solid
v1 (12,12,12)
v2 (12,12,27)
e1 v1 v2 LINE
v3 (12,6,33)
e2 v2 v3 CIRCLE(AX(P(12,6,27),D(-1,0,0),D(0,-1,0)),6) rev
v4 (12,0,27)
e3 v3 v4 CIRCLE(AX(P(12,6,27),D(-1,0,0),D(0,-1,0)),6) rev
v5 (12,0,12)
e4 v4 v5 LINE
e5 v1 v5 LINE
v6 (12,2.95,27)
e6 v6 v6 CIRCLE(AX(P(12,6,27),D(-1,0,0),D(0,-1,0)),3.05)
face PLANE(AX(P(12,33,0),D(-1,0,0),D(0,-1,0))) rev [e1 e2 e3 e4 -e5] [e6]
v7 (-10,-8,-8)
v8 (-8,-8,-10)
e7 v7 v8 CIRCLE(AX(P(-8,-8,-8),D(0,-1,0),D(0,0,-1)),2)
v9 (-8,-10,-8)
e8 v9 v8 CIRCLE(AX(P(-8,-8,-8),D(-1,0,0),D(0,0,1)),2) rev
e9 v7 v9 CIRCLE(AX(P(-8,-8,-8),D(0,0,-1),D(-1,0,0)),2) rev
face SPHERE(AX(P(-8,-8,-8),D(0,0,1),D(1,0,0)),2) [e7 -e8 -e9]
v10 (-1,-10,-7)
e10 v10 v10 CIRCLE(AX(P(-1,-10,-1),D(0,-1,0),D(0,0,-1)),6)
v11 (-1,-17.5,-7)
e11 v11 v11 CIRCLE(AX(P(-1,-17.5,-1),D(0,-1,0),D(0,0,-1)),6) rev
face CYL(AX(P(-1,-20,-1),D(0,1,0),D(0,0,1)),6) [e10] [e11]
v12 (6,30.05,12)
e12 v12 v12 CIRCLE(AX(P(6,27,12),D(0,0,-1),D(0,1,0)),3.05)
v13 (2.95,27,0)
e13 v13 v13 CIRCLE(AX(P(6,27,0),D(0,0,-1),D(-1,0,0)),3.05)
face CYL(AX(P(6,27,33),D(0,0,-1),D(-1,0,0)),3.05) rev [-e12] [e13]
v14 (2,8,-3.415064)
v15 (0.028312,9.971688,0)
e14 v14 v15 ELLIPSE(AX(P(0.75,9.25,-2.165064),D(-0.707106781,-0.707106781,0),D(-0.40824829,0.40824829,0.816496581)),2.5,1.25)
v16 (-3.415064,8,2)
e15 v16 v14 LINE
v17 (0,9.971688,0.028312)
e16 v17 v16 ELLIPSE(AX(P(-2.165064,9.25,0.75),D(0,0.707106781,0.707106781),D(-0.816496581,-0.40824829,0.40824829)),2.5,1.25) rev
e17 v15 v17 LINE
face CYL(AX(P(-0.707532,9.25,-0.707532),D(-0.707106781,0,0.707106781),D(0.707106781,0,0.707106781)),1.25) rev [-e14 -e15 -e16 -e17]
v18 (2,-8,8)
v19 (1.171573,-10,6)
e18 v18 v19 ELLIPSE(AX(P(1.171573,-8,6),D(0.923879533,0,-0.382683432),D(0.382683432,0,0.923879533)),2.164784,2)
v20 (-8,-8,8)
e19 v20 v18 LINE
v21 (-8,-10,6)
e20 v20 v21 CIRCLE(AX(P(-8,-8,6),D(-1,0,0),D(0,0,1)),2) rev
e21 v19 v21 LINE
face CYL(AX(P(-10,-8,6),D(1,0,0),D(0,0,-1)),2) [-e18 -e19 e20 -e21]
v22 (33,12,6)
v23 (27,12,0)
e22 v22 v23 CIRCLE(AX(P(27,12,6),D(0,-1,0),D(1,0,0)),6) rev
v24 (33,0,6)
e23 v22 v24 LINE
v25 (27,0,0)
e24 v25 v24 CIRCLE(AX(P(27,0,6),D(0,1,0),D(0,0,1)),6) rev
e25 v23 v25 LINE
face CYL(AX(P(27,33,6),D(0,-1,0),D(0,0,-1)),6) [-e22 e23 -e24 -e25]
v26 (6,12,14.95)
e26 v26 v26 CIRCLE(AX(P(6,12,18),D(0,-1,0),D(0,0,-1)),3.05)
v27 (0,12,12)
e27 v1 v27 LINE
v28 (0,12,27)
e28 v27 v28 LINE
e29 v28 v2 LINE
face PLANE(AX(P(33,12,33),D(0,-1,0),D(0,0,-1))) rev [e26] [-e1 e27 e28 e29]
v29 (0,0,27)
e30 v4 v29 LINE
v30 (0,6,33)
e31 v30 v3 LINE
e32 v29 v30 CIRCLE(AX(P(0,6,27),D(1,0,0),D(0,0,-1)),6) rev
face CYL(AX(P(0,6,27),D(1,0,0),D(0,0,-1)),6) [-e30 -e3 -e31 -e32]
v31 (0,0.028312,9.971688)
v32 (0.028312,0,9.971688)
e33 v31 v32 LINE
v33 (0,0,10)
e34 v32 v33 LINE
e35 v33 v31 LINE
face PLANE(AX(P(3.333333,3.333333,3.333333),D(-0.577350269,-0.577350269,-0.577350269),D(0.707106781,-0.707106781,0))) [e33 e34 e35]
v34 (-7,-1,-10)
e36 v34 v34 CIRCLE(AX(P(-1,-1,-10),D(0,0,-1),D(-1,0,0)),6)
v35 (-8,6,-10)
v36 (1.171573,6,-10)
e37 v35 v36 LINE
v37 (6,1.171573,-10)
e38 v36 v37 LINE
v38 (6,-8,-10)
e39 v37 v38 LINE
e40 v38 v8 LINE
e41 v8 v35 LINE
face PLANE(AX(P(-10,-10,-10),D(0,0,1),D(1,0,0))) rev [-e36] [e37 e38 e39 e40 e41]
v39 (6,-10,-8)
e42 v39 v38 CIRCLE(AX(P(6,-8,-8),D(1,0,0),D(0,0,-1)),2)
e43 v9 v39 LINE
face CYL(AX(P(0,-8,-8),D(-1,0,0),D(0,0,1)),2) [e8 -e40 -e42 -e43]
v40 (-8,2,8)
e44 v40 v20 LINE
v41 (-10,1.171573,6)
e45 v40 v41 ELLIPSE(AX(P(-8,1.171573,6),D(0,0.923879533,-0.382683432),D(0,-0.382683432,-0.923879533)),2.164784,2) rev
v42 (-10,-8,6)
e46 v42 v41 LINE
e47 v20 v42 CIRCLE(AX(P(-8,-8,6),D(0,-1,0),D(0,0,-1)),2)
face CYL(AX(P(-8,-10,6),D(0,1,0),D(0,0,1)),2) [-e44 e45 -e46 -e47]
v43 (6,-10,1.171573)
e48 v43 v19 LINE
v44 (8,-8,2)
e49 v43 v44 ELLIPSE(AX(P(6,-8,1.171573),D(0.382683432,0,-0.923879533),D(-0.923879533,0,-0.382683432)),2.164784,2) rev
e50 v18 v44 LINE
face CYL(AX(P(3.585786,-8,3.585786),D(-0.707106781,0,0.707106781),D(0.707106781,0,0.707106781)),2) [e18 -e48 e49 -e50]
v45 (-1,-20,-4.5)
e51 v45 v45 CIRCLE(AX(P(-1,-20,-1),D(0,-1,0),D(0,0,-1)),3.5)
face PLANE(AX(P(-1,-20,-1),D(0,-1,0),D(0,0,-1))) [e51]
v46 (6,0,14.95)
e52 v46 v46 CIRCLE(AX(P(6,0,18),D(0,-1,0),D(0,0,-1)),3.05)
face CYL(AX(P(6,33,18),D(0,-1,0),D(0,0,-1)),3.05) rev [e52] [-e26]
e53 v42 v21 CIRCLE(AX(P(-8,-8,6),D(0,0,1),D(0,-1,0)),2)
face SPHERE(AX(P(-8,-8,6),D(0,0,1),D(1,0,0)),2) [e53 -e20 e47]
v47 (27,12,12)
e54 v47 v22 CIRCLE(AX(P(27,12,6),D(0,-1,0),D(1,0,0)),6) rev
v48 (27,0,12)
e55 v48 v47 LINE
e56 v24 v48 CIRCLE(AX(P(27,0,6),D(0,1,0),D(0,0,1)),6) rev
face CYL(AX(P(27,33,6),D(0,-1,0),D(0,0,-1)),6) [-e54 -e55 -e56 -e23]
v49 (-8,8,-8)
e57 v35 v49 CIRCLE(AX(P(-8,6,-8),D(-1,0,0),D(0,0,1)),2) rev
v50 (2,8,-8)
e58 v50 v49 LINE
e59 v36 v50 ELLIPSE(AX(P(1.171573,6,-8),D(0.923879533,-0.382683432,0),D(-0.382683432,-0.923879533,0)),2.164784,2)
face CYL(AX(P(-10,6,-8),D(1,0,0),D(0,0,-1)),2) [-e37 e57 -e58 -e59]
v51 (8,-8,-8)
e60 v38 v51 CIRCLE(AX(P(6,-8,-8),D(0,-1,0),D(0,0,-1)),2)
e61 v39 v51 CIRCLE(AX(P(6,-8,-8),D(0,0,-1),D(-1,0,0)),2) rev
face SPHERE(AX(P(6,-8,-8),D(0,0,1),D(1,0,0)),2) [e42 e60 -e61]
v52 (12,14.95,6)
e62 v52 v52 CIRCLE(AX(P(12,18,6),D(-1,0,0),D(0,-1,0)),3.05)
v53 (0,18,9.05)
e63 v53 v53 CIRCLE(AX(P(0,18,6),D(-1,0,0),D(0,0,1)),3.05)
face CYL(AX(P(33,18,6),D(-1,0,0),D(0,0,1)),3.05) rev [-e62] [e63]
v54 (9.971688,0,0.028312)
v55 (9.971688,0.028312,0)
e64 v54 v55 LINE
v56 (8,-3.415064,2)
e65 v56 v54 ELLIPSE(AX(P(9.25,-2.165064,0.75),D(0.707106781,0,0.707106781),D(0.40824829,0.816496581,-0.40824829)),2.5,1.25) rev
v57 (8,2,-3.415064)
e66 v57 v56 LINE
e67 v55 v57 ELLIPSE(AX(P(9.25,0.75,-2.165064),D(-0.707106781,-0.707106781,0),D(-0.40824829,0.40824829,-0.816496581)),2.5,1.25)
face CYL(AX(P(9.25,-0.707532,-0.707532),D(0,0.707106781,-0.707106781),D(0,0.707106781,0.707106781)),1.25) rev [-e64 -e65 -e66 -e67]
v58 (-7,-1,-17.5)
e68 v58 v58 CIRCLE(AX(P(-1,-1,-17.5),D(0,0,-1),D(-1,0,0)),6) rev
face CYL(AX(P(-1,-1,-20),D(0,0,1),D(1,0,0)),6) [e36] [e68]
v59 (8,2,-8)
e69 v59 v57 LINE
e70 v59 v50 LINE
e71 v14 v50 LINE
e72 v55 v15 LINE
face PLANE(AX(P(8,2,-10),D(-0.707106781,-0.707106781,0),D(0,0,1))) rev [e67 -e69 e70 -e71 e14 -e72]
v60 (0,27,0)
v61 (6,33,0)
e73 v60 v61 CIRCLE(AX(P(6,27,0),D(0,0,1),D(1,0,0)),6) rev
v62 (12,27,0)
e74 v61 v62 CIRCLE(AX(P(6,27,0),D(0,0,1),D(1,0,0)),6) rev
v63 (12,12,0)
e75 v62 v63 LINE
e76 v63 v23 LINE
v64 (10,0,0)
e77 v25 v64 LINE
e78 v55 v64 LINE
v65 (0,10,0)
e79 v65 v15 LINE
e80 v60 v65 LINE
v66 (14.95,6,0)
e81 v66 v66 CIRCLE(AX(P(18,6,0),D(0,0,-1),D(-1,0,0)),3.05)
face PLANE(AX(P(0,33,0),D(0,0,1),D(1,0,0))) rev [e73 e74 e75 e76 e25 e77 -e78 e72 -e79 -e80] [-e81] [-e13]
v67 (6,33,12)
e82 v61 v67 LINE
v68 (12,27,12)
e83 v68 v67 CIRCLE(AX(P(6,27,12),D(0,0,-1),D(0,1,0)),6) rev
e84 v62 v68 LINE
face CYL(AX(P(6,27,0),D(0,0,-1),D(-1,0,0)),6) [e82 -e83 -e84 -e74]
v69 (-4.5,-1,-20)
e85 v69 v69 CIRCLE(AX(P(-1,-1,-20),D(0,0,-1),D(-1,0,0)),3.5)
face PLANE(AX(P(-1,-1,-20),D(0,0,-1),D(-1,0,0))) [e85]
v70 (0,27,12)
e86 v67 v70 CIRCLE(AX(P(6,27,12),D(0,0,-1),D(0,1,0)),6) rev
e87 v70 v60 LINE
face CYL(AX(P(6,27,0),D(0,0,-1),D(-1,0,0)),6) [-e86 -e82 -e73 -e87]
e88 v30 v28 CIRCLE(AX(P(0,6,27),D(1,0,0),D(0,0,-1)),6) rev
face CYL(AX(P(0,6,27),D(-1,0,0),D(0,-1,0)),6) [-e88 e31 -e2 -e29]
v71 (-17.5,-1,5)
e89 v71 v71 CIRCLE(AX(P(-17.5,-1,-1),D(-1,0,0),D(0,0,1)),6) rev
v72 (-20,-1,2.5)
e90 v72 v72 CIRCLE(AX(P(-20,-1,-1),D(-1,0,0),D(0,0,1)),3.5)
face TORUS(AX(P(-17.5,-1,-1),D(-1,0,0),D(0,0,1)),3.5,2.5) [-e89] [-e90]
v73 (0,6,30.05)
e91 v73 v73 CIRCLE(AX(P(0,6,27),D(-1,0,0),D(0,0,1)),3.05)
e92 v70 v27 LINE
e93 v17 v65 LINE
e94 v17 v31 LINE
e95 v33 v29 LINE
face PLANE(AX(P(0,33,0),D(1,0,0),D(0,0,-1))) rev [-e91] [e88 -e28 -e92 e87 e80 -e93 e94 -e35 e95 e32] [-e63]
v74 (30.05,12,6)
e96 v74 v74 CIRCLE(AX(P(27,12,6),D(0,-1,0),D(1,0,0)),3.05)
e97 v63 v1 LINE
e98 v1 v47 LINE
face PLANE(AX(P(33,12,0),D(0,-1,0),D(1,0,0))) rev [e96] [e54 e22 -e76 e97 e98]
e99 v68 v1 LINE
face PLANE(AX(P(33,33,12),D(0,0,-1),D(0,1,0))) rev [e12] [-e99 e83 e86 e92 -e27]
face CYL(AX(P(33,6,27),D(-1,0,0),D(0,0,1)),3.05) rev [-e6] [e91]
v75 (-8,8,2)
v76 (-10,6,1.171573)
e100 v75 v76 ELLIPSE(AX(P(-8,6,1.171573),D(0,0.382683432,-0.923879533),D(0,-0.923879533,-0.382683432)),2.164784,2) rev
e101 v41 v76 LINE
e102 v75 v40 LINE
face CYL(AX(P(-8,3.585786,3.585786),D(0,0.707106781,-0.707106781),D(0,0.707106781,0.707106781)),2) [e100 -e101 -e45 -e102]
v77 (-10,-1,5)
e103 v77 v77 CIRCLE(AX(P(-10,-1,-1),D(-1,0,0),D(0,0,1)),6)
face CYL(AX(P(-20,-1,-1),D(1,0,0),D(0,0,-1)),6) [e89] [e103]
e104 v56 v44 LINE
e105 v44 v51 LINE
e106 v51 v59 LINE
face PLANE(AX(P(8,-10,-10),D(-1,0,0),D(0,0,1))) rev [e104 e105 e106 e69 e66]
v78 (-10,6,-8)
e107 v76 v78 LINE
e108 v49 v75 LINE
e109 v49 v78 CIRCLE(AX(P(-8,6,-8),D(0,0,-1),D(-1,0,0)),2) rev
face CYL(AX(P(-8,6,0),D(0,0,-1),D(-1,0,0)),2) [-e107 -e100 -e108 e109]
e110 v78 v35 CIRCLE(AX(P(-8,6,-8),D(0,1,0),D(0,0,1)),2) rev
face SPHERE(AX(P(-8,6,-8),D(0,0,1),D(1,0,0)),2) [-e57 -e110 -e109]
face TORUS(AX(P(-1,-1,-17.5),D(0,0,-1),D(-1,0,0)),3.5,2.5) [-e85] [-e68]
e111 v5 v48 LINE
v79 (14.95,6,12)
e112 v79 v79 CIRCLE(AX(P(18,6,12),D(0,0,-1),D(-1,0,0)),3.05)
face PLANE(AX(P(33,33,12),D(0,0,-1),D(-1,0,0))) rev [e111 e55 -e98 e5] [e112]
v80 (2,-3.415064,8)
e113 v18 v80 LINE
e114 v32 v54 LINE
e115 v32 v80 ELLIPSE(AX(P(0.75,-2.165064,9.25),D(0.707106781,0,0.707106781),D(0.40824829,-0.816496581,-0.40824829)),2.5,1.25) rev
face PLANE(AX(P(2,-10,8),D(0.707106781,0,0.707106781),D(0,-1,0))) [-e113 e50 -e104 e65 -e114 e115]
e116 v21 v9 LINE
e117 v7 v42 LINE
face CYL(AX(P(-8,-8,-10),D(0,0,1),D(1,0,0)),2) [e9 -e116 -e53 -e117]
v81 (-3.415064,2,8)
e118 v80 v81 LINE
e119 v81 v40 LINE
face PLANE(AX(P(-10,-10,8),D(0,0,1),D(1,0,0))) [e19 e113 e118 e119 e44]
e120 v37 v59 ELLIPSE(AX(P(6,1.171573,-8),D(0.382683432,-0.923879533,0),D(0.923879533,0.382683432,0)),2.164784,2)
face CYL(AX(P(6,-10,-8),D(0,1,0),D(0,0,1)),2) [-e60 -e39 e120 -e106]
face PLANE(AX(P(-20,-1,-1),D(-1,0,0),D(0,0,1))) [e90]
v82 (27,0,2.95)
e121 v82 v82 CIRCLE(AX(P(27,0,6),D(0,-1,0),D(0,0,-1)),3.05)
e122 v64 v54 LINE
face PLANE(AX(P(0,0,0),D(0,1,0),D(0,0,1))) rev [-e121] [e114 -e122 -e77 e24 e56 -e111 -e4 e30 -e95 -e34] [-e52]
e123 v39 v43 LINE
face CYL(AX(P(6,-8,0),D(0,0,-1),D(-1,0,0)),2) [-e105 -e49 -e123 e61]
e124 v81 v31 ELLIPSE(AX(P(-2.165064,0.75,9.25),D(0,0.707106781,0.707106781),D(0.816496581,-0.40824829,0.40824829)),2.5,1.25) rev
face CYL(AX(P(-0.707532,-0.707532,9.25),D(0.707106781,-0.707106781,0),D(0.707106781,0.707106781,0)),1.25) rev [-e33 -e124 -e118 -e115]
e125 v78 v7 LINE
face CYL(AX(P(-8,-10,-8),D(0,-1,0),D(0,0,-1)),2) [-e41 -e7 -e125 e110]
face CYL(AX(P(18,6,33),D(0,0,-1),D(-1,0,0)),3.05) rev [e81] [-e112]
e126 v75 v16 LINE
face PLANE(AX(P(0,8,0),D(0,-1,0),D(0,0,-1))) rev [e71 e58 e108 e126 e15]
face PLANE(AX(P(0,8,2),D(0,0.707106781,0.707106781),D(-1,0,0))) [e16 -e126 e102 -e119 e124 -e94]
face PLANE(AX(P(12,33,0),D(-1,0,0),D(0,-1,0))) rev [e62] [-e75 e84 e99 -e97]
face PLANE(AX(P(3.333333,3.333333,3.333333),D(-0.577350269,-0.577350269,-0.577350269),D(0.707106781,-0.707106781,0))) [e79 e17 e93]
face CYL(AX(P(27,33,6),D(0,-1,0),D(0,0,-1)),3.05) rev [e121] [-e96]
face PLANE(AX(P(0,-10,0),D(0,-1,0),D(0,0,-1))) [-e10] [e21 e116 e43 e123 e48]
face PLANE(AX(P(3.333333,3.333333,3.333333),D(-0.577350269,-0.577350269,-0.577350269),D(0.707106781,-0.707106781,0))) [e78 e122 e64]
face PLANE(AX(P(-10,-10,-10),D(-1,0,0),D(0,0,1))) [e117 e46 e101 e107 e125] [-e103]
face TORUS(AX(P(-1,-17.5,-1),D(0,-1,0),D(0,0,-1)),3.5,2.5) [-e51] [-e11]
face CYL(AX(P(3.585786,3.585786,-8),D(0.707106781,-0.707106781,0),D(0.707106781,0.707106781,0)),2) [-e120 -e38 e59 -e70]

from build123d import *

# Parameters (mm, degrees)
SKETCH1_W                = 33
SKETCH1_H                = 33
BOSS_EXTRUDE1_DEPTH      = 33
SKETCH2_W                = 21
SKETCH2_H                = 21
CUT_EXTRUDE1_DEPTH       = 58.15767665
SKETCH3_W                = 21
SKETCH3_H                = 21
CUT_EXTRUDE2_DEPTH       = 58.15767665
SKETCH4_W                = 21
SKETCH4_H                = 21
CUT_EXTRUDE3_DEPTH       = 58.15767665
SKETCH5_R                = 3.05
CUT_EXTRUDE4_DEPTH       = 58.15767665
SKETCH6_R                = 3.05
CUT_EXTRUDE5_DEPTH       = 58.15767665
SKETCH7_R                = 3.05
CUT_EXTRUDE6_DEPTH       = 58.15767665
FILLET1_R                = 6
CHAMFER1_START           = -1
CHAMFER1_OUTLINE_W       = 16
CHAMFER1_OUTLINE_H       = 18
CHAMFER1_DEPTH           = 6.773502692
BOSS_EXTRUDE3_DEPTH      = 8
BOSS_EXTRUDE3_DEPTH_BACK = 10
SKETCH9_W                = 18
SKETCH9_H                = 18
CHAMFER2_SIZE            = 6
FILLET2_R                = 1.25
SKETCH10_R               = 6
BOSS_EXTRUDE4_DEPTH      = 10
SKETCH11_R               = 6
BOSS_EXTRUDE5_DEPTH      = 10
SKETCH12_R               = 6
BOSS_EXTRUDE6_DEPTH      = 10
FILLET3_R                = 2
FILLET4_R                = 2.5


with BuildPart() as part:
    # Sketch1 → Boss-Extrude1 (new body)
    with BuildSketch(Plane(origin=(0, 0, 0), x_dir=(1, 0, 0), z_dir=(0, 1, 0))):
        with Locations((16.5, -16.5)):
            Rectangle(SKETCH1_W, SKETCH1_H)
    extrude(amount=BOSS_EXTRUDE1_DEPTH)

    # Sketch2 → Cut-Extrude1 (cut, through all)
    with BuildSketch(Plane.XY.offset(33)):
        with Locations((22.5, 22.5)):
            Rectangle(SKETCH2_W, SKETCH2_H)
    extrude(amount=-CUT_EXTRUDE1_DEPTH, mode=Mode.SUBTRACT)

    # Sketch3 → Cut-Extrude2 (cut, through all)
    with BuildSketch(Plane.XZ):
        with Locations((22.5, 22.5)):
            Rectangle(SKETCH3_W, SKETCH3_H)
    extrude(amount=-CUT_EXTRUDE2_DEPTH, mode=Mode.SUBTRACT)

    # Sketch4 → Cut-Extrude3 (cut, through all)
    with BuildSketch(Plane.ZY):
        with Locations((22.5, 22.5)):
            Rectangle(SKETCH4_W, SKETCH4_H)
    extrude(amount=-CUT_EXTRUDE3_DEPTH, mode=Mode.SUBTRACT)

    # Sketch5 → Cut-Extrude4 (cut, through all)
    with BuildSketch(Plane.ZY):
        with Locations((27, 6)):
            Circle(SKETCH5_R)
        with Locations((6, 18)):
            Circle(SKETCH5_R)
    extrude(amount=-CUT_EXTRUDE4_DEPTH, mode=Mode.SUBTRACT)

    # Sketch6 → Cut-Extrude5 (cut, through all)
    with BuildSketch(Plane.XZ):
        with Locations(Location((6, 18, 0), (0, 0, 270))):
            Circle(SKETCH6_R)
        with Locations(Location((27, 6, 0), (0, 0, 270))):
            Circle(SKETCH6_R)
    extrude(amount=-CUT_EXTRUDE5_DEPTH, mode=Mode.SUBTRACT)

    # Sketch7 → Cut-Extrude6 (cut, through all)
    with BuildSketch(Plane(origin=(0, 0, 0), x_dir=(-1, 0, 0), z_dir=(0, 0, -1))):
        with Locations((-18, 6)):
            Circle(SKETCH7_R)
        with Locations((-6, 27)):
            Circle(SKETCH7_R)
    extrude(amount=-CUT_EXTRUDE6_DEPTH, mode=Mode.SUBTRACT)

    # Fillet1
    fillet1_edges = [part.edges().sort_by_distance(p)[0] for p in [
        (12, 33, 6),
        (0, 33, 6),
        (6, 12, 33),
        (6, 0, 33),
        (33, 6, 0),
        (33, 6, 12),
    ]]
    fillet(fillet1_edges, radius=FILLET1_R - 0.0001)  # a hair under: the kernel refuses the full size

    # Chamfer1: read off the stored shape, not the designer's step
    # Chamfer1 outline → Chamfer1 (cut)
    with BuildSketch(Plane(origin=(0, 0, 0), x_dir=(0.8164965809277258, -0.40824829046386313, -0.40824829046386313), z_dir=(0.5773502691896258, 0.5773502691896258, 0.5773502691896258)).offset(CHAMFER1_START)):
        with Locations((2, 0)):
            Rectangle(CHAMFER1_OUTLINE_W, CHAMFER1_OUTLINE_H)
    extrude(amount=CHAMFER1_DEPTH, mode=Mode.SUBTRACT)

    # Sketch9 → Boss-Extrude3 (add, two sides: drawn at the far end of the back side and taken through both)
    with BuildSketch(Plane(origin=(0, 0, 0), x_dir=(1, 0, 0), z_dir=(0, 1, 0)).offset(-BOSS_EXTRUDE3_DEPTH_BACK)):
        with Locations((-1, 1)):
            Rectangle(SKETCH9_W, SKETCH9_H)
    extrude(amount=BOSS_EXTRUDE3_DEPTH + BOSS_EXTRUDE3_DEPTH_BACK)

    # Chamfer2
    chamfer2_edges = [part.edges().sort_by_distance(p)[0] for p in [
        (8, -5, 8),
        (8, 8, -5),
        (-5, 8, 8),
    ]]
    chamfer(chamfer2_edges, length=CHAMFER2_SIZE)

    # Fillet2
    # the kernel refuses this fillet: 1.25 mm, written as the material it adds along each edge
    with BuildSketch(Plane(origin=(-4.268829387, 8, 6.268829387), x_dir=(-0.408248290463863, 0.816496580927726, -0.408248290463863), z_dir=(0.7071067811865476, 0, -0.7071067811865476))) as fillet2_piece_1_section:
        with BuildLine():
            CenterArc((FILLET2_R * 1.93185165258, -FILLET2_R), FILLET2_R, 90, 125.264389683)
            Line((FILLET2_R * 1.11535507165, -FILLET2_R * 1.57735026919), (0, 0))
            Line((0, 0), (FILLET2_R * 1.93185165258, 0))
        make_face()
    fillet2_piece_1 = extrude(amount=14.902499954, mode=Mode.PRIVATE)
    fillet2_piece_1 = split(fillet2_piece_1, bisect_by=Plane(origin=(-1.134414693, 11.134414693, 6.268829387), z_dir=(-0.7071067811865476, -0.7071067811865476, 0)), keep=Keep.TOP, mode=Mode.PRIVATE)
    fillet2_piece_1 = split(fillet2_piece_1, bisect_by=Plane(origin=(-4.268829387, 5.865585306, 4.134414694), z_dir=(0, -0.7071067811865476, -0.7071067811865476)), keep=Keep.TOP, mode=Mode.PRIVATE)
    add(fillet2_piece_1)
    with BuildSketch(Plane(origin=(-4.268829387, 6.268829387, 8), x_dir=(-0.4082482904638628, -0.4082482904638628, 0.8164965809277263), z_dir=(0.7071067811865476, -0.7071067811865476, 0))) as fillet2_piece_2_section:
        with BuildLine():
            CenterArc((FILLET2_R * 1.93185165258, FILLET2_R), FILLET2_R, 144.735610317, 125.264389683)
            Line((FILLET2_R * 1.11535507165, FILLET2_R * 1.57735026919), (0, 0))
            Line((0, 0), (FILLET2_R * 1.93185165258, 0))
        make_face()
    fillet2_piece_2 = extrude(amount=14.902499954, mode=Mode.PRIVATE)
    fillet2_piece_2 = split(fillet2_piece_2, bisect_by=Plane(origin=(-4.268829387, 4.134414694, 5.865585306), z_dir=(0, -0.7071067811865476, -0.7071067811865476)), keep=Keep.TOP, mode=Mode.PRIVATE)
    fillet2_piece_2 = split(fillet2_piece_2, bisect_by=Plane(origin=(-1.134414693, 6.268829387, 11.134414693), z_dir=(-0.7071067811865476, 0, -0.7071067811865475)), keep=Keep.TOP, mode=Mode.PRIVATE)
    add(fillet2_piece_2)
    with BuildSketch(Plane(origin=(8, -4.268829387, 6.268829387), x_dir=(0.8164965809277257, -0.40824829046386313, -0.4082482904638633), z_dir=(0, 0.7071067811865476, -0.7071067811865475))) as fillet2_piece_3_section:
        with BuildLine():
            CenterArc((FILLET2_R * 1.93185165258, FILLET2_R), FILLET2_R, 144.735610317, 125.264389683)
            Line((FILLET2_R * 1.11535507165, FILLET2_R * 1.57735026919), (0, 0))
            Line((0, 0), (FILLET2_R * 1.93185165258, 0))
        make_face()
    fillet2_piece_3 = extrude(amount=14.902499954, mode=Mode.PRIVATE)
    fillet2_piece_3 = split(fillet2_piece_3, bisect_by=Plane(origin=(11.134414693, -1.134414693, 6.268829387), z_dir=(-0.7071067811865476, -0.7071067811865476, 0)), keep=Keep.TOP, mode=Mode.PRIVATE)
    fillet2_piece_3 = split(fillet2_piece_3, bisect_by=Plane(origin=(5.865585306, -4.268829387, 4.134414694), z_dir=(-0.7071067811865476, 0, -0.7071067811865475)), keep=Keep.TOP, mode=Mode.PRIVATE)
    add(fillet2_piece_3)

    # Sketch10 → Boss-Extrude4 (add)
    with BuildSketch(Plane.XZ.offset(10)):
        with Locations(Location((-1, -1, 0), (0, 0, 270))):
            Circle(SKETCH10_R)
    extrude(amount=BOSS_EXTRUDE4_DEPTH)

    # Sketch11 → Boss-Extrude5 (add)
    with BuildSketch(Plane.ZY.offset(10)):
        with Locations((-1, -1)):
            Circle(SKETCH11_R)
    extrude(amount=BOSS_EXTRUDE5_DEPTH)

    # Sketch12 → Boss-Extrude6 (add)
    with BuildSketch(Plane(origin=(0, 0, -10), x_dir=(-1, 0, 0), z_dir=(0, 0, -1))):
        with Locations((1, -1)):
            Circle(SKETCH12_R)
    extrude(amount=BOSS_EXTRUDE6_DEPTH)

    # Fillet3
    fillet3_edges = [part.edges().sort_by_distance(p)[0] for p in [
        (8, -4, -10),
        (-4, -10, 8),
        (-10, 8, -4),
        (-10, -1, -10),
        (-4, 8, -10),
        (-10, -4, 8),
        (-10, -10, -1),
        (-1, -10, -10),
        (8, -10, -4),
        (5, -10, 5),
        (5, 5, -10),
        (-10, 5, 5),
    ]]
    fillet(fillet3_edges, radius=FILLET3_R)

    # Fillet4
    fillet4_edges = [part.edges().sort_by_distance(p)[0] for p in [
        (-1, -20, 5),
        (-20, -1, -7),
        (5, -1, -20),
    ]]
    fillet(fillet4_edges, radius=FILLET4_R)


solid = part.part
